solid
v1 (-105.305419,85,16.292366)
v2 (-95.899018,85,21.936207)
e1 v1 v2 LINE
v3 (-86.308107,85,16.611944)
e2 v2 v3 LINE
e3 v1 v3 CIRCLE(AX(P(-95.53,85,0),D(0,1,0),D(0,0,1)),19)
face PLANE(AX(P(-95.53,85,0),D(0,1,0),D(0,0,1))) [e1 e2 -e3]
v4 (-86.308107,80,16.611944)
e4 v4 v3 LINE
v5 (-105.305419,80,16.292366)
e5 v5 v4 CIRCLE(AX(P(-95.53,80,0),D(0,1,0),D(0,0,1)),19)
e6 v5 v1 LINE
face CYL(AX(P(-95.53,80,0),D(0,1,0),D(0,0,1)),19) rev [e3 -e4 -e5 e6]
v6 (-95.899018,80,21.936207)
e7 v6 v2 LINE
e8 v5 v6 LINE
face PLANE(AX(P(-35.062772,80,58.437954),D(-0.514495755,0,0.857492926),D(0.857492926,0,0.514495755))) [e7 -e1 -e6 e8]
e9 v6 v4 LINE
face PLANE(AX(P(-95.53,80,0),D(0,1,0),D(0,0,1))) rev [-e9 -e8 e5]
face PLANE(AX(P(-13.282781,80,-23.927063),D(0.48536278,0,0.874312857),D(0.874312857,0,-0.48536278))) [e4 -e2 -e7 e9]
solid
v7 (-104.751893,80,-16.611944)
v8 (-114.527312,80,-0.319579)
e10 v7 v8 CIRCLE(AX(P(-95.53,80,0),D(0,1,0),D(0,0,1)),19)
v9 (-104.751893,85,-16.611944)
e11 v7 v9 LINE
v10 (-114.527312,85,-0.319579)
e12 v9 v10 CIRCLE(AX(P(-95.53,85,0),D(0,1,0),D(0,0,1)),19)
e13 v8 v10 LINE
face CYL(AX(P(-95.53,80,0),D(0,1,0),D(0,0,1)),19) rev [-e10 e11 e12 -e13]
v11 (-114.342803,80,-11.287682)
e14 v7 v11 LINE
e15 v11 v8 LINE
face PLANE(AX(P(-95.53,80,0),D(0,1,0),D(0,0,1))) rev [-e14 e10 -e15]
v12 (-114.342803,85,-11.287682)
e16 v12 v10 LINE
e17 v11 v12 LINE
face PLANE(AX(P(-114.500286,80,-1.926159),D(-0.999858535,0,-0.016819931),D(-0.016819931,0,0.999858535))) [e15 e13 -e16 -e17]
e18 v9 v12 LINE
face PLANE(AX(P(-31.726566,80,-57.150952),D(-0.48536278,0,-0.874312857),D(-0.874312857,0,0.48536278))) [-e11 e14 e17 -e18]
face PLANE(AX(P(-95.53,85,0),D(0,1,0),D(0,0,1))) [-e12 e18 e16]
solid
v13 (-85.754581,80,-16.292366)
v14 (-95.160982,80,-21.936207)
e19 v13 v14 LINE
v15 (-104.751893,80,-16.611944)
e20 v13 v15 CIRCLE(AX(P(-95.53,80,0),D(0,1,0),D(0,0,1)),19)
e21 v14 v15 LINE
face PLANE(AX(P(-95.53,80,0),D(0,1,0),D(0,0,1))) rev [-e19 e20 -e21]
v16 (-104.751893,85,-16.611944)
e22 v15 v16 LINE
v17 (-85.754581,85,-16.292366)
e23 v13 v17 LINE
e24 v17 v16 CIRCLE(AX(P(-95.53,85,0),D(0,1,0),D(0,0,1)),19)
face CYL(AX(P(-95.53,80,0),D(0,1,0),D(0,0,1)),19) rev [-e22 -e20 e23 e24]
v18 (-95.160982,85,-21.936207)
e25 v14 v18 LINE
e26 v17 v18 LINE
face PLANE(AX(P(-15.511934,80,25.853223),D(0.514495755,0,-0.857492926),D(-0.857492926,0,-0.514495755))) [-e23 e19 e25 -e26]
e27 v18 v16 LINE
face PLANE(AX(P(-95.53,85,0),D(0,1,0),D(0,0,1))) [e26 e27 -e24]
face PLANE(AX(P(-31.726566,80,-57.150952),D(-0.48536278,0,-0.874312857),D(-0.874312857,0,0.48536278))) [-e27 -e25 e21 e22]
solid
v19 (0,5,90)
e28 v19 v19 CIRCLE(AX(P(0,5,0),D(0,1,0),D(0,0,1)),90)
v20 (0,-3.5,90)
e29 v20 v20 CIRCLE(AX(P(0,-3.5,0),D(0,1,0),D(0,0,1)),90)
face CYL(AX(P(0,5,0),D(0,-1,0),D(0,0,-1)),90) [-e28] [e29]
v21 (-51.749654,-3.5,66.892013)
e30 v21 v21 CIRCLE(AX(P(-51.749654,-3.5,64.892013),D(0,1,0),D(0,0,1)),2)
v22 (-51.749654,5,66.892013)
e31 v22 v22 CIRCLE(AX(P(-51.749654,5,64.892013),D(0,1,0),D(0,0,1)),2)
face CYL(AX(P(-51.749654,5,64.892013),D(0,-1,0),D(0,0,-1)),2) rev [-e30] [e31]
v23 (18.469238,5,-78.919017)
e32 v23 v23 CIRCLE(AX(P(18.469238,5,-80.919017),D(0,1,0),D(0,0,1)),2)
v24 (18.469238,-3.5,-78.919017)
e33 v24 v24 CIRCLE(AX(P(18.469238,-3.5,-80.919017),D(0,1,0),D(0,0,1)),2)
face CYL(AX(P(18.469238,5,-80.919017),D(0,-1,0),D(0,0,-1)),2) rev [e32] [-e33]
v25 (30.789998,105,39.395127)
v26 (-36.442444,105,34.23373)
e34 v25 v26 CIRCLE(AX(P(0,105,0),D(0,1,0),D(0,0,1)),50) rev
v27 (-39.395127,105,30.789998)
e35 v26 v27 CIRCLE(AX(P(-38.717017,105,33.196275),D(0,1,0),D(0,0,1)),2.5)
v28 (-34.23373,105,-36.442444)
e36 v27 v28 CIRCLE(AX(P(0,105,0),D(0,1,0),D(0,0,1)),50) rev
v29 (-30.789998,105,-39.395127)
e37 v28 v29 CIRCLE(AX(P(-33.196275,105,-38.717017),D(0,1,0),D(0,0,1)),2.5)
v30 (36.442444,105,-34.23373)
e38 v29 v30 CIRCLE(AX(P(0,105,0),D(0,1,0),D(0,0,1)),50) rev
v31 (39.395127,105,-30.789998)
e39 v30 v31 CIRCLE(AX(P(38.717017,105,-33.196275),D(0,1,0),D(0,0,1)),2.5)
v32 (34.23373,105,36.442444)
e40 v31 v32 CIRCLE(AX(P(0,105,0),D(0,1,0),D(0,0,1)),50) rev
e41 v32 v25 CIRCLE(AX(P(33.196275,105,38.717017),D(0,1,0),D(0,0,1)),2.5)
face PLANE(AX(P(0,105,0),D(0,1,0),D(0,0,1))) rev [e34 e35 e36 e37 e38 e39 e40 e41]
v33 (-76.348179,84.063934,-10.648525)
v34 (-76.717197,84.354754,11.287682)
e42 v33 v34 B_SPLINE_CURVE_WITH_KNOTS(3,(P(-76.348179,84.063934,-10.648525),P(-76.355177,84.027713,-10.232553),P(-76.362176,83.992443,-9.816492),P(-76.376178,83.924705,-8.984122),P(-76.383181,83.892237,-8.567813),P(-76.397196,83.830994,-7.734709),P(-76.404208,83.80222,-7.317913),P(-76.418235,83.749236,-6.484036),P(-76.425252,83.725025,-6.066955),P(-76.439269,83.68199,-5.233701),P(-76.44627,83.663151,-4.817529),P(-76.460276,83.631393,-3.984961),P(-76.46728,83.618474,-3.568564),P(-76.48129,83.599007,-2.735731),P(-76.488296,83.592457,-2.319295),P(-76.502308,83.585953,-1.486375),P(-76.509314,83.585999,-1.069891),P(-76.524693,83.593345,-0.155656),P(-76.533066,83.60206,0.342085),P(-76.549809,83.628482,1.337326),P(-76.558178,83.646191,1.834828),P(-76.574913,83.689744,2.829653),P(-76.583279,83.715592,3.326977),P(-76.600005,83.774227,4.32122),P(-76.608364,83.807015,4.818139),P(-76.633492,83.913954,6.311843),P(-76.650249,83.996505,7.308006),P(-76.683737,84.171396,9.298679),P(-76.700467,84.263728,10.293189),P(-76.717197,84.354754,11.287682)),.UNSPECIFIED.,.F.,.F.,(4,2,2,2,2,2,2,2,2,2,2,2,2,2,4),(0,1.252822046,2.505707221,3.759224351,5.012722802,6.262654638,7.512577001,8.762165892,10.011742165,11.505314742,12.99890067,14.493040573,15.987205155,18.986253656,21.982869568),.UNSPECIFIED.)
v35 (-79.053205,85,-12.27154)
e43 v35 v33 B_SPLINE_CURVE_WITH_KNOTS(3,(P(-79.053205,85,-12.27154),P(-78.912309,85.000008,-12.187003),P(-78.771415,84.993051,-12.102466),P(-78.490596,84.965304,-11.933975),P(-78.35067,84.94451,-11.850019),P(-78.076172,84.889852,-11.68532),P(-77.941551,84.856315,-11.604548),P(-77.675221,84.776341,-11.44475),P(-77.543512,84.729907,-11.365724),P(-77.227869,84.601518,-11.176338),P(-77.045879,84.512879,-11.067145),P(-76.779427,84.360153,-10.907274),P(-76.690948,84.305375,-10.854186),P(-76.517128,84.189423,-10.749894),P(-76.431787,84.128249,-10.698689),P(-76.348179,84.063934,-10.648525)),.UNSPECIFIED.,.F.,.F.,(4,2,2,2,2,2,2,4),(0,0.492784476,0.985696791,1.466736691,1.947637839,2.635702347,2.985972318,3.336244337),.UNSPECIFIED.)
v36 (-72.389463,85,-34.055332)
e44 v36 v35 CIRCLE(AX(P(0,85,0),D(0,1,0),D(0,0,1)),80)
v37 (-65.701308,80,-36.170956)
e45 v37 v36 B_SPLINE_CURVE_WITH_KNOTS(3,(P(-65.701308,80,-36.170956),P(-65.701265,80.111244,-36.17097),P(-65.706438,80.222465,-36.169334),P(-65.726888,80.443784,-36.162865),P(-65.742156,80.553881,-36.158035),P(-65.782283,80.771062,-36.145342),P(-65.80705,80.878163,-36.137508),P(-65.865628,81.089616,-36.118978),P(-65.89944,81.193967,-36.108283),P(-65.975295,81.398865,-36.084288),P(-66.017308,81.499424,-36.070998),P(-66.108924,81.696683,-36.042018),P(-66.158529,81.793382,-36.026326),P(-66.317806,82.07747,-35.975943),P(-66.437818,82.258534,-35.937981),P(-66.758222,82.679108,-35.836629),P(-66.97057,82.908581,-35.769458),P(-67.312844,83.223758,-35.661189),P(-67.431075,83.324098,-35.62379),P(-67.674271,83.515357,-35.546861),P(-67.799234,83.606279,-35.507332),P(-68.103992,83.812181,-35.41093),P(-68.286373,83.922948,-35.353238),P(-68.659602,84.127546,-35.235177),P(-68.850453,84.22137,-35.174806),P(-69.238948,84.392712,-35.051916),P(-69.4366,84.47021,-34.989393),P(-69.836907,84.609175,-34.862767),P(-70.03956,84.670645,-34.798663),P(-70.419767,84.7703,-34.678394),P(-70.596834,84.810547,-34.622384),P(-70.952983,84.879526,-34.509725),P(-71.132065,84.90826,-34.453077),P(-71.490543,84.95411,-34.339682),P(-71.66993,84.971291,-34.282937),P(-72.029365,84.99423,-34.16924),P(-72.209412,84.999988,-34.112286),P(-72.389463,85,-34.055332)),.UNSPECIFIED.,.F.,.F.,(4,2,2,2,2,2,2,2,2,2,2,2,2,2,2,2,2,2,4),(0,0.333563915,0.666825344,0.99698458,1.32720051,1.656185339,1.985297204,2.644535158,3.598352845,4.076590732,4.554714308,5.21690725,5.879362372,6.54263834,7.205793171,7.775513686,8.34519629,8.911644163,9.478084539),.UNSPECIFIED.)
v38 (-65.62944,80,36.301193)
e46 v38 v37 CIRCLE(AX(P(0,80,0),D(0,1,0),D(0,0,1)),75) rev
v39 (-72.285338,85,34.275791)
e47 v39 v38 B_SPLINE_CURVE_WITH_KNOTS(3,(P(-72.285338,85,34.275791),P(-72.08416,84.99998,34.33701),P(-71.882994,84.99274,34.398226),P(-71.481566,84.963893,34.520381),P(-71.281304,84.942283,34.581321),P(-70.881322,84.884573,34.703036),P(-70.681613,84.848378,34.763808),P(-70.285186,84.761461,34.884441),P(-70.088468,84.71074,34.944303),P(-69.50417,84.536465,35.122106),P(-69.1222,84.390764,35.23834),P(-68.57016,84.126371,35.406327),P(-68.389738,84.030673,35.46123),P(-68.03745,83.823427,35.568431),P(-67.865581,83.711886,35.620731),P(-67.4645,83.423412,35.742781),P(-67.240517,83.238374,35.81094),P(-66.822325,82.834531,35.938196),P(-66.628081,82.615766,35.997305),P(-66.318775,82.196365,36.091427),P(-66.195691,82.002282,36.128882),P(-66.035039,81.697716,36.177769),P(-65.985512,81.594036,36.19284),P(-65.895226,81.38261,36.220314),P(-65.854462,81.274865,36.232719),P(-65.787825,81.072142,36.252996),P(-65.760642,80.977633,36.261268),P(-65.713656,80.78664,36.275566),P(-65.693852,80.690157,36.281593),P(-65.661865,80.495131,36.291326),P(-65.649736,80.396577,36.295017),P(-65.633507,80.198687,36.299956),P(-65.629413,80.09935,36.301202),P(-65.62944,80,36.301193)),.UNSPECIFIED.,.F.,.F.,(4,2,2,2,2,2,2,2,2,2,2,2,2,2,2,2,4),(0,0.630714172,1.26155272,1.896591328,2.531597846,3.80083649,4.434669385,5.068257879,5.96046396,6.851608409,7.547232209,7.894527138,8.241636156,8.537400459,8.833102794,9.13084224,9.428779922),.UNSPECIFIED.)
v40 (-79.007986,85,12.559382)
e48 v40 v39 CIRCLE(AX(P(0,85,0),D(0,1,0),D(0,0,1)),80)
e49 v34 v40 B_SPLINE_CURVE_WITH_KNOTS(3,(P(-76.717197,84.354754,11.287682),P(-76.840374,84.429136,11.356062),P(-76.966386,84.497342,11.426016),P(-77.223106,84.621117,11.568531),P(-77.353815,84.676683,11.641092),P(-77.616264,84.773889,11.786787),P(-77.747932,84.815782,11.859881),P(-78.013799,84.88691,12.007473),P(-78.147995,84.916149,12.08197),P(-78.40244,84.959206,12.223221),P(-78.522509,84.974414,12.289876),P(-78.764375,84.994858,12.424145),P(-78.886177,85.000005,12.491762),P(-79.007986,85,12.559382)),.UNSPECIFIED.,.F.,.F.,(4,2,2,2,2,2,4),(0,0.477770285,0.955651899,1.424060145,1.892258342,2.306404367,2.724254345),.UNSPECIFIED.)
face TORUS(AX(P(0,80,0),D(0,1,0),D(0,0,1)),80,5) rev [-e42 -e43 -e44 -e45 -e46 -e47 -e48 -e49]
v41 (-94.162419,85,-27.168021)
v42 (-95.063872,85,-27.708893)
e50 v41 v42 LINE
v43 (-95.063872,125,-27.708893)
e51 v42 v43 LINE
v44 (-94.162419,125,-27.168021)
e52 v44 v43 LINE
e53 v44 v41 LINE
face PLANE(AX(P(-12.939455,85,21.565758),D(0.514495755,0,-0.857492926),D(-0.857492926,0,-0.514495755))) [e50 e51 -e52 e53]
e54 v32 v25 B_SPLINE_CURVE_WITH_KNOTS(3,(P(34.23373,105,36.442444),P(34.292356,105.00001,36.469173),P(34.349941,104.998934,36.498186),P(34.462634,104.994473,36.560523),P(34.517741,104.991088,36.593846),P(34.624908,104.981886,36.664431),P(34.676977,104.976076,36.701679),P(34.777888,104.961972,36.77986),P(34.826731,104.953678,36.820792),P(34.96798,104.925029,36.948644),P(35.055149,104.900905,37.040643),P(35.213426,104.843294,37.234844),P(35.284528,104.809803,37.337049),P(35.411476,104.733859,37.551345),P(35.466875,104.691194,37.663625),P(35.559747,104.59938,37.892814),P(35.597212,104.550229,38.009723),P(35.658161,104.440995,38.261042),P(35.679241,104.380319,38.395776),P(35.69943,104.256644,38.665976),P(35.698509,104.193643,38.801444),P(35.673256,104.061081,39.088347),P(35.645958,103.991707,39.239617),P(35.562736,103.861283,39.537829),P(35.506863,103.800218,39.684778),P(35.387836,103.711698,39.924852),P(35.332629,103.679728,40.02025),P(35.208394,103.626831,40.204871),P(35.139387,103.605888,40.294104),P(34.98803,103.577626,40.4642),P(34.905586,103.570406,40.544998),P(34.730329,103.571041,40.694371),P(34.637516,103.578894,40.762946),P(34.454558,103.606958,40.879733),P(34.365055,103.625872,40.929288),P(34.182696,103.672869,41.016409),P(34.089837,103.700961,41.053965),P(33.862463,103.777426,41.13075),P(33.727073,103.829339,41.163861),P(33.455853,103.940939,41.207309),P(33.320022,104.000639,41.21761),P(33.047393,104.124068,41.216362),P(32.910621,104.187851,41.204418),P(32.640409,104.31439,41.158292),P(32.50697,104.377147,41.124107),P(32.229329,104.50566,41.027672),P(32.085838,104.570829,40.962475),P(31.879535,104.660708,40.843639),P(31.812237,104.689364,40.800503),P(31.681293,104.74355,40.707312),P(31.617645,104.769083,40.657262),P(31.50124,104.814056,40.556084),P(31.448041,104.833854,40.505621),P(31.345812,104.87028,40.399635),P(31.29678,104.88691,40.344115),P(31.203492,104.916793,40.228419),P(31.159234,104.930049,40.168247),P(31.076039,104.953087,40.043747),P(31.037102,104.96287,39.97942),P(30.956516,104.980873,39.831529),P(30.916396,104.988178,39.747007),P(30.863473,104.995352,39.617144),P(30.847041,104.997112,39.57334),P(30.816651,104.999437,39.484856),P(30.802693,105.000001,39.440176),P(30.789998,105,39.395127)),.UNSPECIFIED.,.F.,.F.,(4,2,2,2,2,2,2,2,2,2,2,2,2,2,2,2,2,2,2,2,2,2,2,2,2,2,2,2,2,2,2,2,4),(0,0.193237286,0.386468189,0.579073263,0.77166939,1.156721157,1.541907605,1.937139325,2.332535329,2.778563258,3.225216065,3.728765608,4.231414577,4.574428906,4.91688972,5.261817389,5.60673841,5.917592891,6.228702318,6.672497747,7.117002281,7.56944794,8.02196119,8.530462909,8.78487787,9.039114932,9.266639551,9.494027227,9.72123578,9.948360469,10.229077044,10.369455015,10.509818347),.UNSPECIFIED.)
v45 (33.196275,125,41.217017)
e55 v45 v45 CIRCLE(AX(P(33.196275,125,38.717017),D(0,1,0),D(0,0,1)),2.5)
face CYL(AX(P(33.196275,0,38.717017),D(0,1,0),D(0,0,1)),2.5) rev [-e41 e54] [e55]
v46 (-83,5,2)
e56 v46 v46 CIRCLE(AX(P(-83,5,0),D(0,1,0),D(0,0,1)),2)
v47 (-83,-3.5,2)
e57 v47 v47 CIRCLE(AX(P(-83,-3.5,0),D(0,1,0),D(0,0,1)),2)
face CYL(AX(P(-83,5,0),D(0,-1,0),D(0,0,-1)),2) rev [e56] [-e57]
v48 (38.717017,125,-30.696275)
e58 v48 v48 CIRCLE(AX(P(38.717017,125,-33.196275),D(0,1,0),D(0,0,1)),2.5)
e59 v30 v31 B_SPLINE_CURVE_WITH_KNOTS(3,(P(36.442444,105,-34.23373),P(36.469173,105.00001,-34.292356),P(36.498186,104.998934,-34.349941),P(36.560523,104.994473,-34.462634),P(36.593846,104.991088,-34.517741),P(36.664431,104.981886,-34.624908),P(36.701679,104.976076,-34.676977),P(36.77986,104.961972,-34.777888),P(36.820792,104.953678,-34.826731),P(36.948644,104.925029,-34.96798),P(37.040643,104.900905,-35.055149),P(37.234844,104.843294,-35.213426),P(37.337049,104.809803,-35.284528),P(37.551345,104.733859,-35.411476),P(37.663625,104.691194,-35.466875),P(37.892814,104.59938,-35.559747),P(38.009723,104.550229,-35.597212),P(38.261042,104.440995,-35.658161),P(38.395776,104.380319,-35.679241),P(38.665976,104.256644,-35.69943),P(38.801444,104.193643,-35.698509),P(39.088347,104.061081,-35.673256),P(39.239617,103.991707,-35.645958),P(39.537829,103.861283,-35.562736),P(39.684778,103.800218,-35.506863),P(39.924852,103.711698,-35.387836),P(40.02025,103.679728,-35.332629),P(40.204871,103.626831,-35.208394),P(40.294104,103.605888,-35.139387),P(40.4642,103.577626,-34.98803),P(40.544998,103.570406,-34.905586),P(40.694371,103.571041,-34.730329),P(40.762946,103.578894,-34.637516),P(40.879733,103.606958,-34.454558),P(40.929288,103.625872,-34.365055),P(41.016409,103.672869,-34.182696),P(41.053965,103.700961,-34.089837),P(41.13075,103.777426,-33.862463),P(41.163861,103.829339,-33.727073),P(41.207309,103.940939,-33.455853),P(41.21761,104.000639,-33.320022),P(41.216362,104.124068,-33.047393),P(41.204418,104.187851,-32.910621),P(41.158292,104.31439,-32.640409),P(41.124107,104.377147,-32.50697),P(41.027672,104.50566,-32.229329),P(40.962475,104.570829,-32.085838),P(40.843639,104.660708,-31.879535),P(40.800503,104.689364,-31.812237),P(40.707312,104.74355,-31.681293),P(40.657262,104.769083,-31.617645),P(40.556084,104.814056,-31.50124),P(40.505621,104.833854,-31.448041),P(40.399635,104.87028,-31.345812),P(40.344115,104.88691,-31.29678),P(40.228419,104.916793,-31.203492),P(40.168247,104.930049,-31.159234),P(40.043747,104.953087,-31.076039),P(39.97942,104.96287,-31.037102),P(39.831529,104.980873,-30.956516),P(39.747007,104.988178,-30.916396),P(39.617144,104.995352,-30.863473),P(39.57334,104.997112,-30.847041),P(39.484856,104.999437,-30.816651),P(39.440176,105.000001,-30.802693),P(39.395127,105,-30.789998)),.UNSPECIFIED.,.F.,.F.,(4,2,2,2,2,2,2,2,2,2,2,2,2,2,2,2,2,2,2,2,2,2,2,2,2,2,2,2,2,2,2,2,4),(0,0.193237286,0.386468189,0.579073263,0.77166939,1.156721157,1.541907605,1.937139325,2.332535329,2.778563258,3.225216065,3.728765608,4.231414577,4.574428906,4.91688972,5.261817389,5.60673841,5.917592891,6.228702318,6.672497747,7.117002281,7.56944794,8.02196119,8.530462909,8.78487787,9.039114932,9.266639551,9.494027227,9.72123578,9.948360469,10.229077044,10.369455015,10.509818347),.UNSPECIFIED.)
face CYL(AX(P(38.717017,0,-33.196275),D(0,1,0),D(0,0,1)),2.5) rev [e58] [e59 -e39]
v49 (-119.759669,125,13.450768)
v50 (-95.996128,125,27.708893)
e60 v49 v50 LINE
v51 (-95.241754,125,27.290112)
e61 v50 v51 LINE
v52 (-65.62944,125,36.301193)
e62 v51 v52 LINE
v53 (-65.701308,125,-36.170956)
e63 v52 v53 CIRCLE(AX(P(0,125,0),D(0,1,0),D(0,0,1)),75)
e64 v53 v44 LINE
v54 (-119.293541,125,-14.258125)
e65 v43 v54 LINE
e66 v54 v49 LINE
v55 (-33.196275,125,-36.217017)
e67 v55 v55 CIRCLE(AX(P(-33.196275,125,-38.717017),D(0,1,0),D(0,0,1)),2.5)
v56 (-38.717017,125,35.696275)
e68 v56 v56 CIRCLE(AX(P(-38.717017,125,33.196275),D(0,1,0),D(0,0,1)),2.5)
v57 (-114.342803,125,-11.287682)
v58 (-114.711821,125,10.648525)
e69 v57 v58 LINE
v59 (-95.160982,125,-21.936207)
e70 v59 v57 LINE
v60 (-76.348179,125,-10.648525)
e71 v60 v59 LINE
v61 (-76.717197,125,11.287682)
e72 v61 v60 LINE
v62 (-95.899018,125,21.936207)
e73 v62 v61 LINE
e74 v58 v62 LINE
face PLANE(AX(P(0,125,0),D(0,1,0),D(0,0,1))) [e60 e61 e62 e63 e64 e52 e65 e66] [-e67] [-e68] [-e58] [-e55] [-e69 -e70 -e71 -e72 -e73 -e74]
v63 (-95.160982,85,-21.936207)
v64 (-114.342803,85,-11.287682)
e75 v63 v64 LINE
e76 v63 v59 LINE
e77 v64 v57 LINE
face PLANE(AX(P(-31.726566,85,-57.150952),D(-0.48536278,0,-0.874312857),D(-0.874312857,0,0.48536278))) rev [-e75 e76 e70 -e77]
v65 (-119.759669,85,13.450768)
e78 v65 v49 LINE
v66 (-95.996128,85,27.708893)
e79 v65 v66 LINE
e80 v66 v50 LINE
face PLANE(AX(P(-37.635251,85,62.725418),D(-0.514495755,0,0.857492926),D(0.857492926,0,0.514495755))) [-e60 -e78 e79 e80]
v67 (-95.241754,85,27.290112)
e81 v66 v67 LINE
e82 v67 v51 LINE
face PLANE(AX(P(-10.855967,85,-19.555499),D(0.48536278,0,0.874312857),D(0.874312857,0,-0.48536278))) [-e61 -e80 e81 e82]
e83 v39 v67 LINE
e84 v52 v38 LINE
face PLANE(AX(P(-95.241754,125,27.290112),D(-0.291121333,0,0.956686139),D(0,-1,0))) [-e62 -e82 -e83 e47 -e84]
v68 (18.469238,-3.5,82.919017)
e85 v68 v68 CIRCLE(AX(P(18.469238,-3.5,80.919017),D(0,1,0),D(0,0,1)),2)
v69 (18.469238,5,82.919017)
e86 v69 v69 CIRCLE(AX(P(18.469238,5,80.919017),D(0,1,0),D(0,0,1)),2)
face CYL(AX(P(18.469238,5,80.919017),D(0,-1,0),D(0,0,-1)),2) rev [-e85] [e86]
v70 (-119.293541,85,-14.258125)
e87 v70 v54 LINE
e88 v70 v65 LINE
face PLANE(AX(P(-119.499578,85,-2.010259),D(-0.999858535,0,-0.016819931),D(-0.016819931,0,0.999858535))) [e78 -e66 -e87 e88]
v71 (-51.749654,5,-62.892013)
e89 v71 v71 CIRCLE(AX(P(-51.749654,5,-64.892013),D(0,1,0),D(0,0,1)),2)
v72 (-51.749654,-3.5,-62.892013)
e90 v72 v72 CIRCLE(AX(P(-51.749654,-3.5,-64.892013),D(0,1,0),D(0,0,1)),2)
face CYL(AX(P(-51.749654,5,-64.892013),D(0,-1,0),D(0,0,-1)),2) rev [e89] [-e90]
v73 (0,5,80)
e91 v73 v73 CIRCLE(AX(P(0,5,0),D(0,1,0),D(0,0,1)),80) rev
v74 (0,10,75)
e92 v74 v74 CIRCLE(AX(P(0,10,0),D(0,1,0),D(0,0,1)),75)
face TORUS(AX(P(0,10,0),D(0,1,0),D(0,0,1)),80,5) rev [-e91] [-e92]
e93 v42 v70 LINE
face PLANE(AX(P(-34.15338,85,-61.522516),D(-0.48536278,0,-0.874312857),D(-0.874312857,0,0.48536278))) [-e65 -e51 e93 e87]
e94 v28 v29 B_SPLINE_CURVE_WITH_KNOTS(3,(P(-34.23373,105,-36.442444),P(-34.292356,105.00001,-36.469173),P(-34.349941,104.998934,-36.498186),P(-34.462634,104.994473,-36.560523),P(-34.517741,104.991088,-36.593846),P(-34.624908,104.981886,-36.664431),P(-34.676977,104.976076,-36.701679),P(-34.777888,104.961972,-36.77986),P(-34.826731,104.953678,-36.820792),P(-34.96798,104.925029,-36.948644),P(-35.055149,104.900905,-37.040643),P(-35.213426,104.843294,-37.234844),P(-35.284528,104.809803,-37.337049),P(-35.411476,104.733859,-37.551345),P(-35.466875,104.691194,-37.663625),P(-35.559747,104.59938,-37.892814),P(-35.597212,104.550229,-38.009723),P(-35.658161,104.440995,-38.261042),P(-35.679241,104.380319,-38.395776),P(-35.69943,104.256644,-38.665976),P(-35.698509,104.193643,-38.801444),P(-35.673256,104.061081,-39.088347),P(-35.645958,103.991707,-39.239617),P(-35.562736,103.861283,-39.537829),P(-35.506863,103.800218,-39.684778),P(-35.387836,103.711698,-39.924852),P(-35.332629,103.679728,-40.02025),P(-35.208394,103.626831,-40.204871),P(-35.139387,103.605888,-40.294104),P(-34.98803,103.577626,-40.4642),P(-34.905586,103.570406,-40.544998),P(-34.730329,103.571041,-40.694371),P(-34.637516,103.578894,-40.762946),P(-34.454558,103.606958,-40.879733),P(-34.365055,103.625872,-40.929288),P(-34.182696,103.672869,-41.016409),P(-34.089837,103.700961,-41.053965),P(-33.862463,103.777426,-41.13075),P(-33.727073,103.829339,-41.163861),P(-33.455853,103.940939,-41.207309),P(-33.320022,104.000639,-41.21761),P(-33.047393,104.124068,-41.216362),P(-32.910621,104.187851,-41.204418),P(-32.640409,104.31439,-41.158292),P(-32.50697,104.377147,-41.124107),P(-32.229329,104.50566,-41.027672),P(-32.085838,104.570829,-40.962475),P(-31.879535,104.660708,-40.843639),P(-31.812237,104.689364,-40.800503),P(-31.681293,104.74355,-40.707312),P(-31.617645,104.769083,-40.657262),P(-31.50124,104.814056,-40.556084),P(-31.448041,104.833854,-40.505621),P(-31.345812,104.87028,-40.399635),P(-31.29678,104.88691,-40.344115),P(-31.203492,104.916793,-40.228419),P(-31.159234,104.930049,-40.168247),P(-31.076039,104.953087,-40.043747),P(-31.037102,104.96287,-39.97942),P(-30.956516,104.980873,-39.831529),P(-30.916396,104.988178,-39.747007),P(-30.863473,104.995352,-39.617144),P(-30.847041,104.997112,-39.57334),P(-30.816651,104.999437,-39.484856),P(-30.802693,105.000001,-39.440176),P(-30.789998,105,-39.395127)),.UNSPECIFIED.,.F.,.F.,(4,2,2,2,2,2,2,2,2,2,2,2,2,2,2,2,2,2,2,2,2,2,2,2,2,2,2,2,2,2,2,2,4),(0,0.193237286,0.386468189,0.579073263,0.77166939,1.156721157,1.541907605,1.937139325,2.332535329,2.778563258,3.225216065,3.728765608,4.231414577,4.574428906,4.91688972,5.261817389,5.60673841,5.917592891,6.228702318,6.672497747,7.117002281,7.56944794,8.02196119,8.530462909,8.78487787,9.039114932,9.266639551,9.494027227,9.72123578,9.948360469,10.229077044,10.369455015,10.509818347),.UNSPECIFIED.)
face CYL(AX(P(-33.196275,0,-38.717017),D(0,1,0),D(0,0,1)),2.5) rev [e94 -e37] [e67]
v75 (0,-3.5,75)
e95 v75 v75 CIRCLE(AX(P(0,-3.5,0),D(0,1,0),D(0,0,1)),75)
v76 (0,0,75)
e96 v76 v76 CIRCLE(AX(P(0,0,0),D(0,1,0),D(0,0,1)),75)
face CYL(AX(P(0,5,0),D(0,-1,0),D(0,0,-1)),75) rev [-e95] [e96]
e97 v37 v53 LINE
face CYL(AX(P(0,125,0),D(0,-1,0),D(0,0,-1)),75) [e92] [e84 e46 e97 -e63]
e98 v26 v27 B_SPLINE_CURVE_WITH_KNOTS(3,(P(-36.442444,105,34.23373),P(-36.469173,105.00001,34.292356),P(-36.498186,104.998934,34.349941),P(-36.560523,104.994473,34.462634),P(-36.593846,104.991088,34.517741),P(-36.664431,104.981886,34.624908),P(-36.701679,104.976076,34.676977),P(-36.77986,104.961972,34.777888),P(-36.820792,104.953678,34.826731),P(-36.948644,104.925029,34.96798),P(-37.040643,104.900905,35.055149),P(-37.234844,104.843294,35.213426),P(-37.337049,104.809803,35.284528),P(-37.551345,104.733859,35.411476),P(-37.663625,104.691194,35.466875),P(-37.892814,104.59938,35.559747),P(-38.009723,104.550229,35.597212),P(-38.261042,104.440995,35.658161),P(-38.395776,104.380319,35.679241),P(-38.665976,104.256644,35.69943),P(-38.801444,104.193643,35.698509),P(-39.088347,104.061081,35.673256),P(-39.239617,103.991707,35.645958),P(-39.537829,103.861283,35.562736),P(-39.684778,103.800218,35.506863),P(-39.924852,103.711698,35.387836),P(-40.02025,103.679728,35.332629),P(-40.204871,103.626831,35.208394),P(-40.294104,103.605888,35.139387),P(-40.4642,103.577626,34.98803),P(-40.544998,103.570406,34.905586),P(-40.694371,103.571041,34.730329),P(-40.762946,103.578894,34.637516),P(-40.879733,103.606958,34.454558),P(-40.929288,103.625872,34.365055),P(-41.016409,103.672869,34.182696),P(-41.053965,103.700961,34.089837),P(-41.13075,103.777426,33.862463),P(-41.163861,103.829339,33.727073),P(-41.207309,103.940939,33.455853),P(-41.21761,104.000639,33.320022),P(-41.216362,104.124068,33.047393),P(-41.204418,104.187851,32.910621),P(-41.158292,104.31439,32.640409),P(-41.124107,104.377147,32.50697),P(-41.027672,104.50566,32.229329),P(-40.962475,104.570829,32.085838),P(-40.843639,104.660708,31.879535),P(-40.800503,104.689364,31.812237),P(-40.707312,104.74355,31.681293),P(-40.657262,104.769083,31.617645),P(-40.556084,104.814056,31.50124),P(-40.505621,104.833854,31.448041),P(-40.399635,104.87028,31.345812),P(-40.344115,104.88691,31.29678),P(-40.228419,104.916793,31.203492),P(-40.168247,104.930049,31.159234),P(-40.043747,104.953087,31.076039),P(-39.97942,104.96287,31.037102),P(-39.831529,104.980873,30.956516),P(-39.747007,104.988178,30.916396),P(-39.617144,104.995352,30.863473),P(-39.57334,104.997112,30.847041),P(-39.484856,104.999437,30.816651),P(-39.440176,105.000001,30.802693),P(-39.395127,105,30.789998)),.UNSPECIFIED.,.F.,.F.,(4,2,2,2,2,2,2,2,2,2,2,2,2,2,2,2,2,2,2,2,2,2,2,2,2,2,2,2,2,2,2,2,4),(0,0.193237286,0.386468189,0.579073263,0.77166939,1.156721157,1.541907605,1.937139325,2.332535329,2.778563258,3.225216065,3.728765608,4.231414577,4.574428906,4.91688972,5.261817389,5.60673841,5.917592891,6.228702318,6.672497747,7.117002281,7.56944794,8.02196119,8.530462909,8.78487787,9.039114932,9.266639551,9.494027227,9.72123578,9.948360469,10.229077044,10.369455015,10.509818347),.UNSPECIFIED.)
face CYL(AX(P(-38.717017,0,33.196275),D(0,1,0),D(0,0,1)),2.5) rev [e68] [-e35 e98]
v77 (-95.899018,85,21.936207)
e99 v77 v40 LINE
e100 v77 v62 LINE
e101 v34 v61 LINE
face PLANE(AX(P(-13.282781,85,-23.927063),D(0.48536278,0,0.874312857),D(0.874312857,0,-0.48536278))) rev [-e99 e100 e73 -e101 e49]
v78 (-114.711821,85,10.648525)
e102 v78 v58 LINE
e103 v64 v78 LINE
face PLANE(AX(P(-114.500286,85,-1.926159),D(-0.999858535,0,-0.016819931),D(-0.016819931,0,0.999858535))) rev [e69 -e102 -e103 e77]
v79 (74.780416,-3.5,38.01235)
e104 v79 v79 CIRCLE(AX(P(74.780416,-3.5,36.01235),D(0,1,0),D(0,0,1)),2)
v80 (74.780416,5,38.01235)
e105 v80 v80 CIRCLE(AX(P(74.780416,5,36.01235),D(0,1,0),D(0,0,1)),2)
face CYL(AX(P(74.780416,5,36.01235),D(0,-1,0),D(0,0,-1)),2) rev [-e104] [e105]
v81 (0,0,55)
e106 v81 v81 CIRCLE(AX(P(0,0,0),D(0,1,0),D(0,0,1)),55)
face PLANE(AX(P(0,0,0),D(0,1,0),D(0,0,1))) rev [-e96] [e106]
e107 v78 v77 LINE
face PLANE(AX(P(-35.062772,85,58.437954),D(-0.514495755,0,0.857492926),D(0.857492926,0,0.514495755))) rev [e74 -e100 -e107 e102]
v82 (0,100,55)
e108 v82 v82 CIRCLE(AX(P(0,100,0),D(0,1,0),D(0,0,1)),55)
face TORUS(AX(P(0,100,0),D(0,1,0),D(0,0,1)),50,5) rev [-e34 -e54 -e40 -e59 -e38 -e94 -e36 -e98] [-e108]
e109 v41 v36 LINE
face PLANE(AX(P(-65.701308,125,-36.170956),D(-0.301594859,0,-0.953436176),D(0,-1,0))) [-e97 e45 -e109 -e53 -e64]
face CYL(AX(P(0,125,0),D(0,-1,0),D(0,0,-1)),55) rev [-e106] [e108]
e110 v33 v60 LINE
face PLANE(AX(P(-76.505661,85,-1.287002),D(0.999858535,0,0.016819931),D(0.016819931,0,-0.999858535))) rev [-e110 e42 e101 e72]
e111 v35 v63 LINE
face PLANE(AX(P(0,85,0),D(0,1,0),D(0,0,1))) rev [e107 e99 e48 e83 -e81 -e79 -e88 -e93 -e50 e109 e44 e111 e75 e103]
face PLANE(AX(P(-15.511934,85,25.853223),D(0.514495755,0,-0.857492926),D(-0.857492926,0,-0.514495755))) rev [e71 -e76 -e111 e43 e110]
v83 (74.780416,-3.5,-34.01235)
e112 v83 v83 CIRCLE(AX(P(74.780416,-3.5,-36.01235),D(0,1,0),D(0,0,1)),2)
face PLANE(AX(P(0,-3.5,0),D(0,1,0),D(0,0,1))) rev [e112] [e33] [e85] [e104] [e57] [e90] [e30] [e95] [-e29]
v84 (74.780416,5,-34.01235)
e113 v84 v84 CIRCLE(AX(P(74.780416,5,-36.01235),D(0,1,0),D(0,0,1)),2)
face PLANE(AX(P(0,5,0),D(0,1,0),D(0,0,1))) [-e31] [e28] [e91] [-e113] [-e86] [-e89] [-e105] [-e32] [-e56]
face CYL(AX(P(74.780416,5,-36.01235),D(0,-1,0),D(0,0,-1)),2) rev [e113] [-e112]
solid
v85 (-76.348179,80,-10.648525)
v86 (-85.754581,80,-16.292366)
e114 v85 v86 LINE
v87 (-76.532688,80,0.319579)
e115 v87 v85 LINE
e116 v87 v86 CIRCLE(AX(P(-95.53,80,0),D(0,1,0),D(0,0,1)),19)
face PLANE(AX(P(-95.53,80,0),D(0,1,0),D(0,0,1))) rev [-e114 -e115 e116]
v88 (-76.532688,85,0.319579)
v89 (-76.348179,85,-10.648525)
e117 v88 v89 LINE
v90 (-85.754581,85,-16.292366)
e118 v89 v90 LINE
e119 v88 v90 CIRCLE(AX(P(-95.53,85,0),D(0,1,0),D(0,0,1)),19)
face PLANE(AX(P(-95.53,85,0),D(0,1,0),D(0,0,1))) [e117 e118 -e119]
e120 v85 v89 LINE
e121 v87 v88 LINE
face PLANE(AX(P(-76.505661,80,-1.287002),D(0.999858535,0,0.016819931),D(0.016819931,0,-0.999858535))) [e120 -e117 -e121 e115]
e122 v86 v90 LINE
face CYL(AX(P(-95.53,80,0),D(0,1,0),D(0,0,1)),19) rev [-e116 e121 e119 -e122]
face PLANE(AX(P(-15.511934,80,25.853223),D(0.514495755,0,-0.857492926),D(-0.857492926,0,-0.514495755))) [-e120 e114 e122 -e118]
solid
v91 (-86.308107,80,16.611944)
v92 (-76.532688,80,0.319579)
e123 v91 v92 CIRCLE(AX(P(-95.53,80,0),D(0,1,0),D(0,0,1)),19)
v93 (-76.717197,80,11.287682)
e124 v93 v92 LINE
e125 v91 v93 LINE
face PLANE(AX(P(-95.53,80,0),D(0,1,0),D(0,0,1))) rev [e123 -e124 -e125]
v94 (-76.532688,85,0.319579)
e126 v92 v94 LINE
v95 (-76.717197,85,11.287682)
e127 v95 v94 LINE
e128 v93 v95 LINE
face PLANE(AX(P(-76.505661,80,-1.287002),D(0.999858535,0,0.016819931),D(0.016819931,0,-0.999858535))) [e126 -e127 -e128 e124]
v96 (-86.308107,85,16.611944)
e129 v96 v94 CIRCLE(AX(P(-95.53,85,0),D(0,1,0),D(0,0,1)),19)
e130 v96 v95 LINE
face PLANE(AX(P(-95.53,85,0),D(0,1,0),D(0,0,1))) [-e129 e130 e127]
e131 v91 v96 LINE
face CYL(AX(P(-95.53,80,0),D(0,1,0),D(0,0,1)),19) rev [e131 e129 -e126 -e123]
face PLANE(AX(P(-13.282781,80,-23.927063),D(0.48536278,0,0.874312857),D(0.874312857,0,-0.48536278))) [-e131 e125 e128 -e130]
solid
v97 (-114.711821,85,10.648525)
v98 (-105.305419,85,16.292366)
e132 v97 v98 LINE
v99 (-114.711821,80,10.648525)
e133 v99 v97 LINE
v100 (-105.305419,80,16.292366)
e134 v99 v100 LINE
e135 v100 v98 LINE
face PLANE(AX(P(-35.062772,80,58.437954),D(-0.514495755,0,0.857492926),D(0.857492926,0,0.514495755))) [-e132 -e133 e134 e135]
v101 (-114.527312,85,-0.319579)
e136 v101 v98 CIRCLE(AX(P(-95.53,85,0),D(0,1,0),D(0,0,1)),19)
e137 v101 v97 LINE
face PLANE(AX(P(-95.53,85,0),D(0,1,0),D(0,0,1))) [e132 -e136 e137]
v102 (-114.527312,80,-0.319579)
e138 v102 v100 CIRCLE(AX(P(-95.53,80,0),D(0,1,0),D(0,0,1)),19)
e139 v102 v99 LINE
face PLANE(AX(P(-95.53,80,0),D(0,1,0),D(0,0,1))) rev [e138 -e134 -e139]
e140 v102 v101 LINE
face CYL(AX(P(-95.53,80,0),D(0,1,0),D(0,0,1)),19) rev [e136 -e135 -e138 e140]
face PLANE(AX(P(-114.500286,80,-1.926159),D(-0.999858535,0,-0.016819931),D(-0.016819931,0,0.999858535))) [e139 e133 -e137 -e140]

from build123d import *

# Parameters (mm, degrees)
CROQUIS4_R                 = 75
SALIENTE_EXTRUIR2_DEPTH    = 125
VACIADO1_T                 = -20
CROQUIS7_R                 = 2.5
CORTAR_EXTRUIR3_DEPTH      = 164.935963108
SALIENTE_EXTRUIR5_START    = -3.5
CROQUIS4_3_R               = 90
CROQUIS4_3_R_2             = 75
CROQUIS4_3_R_3             = 2
SALIENTE_EXTRUIR5_DEPTH    = 8.5
CROQUIS8_R                 = 19
SALIENTE_EXTRUIR7_DEPTH    = 40
REDONDEO2_R                = 5
REDONDEO4_R                = 5
SALIENTE_EXTRUIR13_START   = -40
SALIENTE_EXTRUIR13_DEPTH   = 5
SALIENTE_EXTRUIR13_2_DEPTH = 5
SALIENTE_EXTRUIR13_3_DEPTH = 5
SALIENTE_EXTRUIR13_4_DEPTH = 5
SALIENTE_EXTRUIR13_5_DEPTH = 5
SALIENTE_EXTRUIR13_6_DEPTH = 5
REDONDEO6_R                = 5


with BuildPart() as part:
    # Croquis4 → Saliente-Extruir2 (new body)
    with BuildSketch(Plane(origin=(0, 0, 0), x_dir=(1, 0, 0), z_dir=(0, 1, 0))):
        with Locations(Location((0, 0, 0), (0, 0, 270))):
            Circle(CROQUIS4_R)
    extrude(amount=SALIENTE_EXTRUIR2_DEPTH)

    # Vaciado1
    vaciado1_openings = [part.faces().sort_by_distance(p)[0] for p in [
        (0, 0, 0),
    ]]
    offset(amount=VACIADO1_T, openings=vaciado1_openings, kind=Kind.INTERSECTION)

    # Croquis7 → Cortar-Extruir3 (cut, through all)
    with BuildSketch(Plane(origin=(0, 125, 0), x_dir=(1, 0, 0), z_dir=(0, 1, 0))):
        with Locations(Location((38.717017325, 33.196274595, 0), (0, 0, 270))):
            Circle(CROQUIS7_R)
        with Locations(Location((33.196274595, -38.717017325, 0), (0, 0, 270))):
            Circle(CROQUIS7_R)
        with Locations(Location((-38.717017325, -33.196274595, 0), (0, 0, 270))):
            Circle(CROQUIS7_R)
        with Locations(Location((-33.196274595, 38.717017325, 0), (0, 0, 270))):
            Circle(CROQUIS7_R)
    extrude(amount=-CORTAR_EXTRUIR3_DEPTH, mode=Mode.SUBTRACT)

    # Croquis4<3> → Saliente-Extruir5 (add)
    with BuildSketch(Plane(origin=(0, 0, 0), x_dir=(1, 0, 0), z_dir=(0, 1, 0)).offset(SALIENTE_EXTRUIR5_START)):
        with Locations(Location((0, 0, 0), (0, 0, 270))):
            Circle(CROQUIS4_3_R)
        with Locations(Location((0, 0, 0), (0, 0, 270))):
            Circle(CROQUIS4_3_R_2, mode=Mode.SUBTRACT)
        with Locations(Location((-83, 0, 0), (0, 0, 270))):
            Circle(CROQUIS4_3_R_3, mode=Mode.SUBTRACT)
        with Locations(Location((-51.749653554, 64.892013045, 0), (0, 0, 270))):
            Circle(CROQUIS4_3_R_3, mode=Mode.SUBTRACT)
        with Locations(Location((18.469237518, 80.919016711, 0), (0, 0, 270))):
            Circle(CROQUIS4_3_R_3, mode=Mode.SUBTRACT)
        with Locations(Location((74.780416036, 36.012350347, 0), (0, 0, 270))):
            Circle(CROQUIS4_3_R_3, mode=Mode.SUBTRACT)
        with Locations(Location((74.780416036, -36.012350347, 0), (0, 0, 270))):
            Circle(CROQUIS4_3_R_3, mode=Mode.SUBTRACT)
        with Locations(Location((18.469237518, -80.919016711, 0), (0, 0, 270))):
            Circle(CROQUIS4_3_R_3, mode=Mode.SUBTRACT)
        with Locations(Location((-51.749653554, -64.892013045, 0), (0, 0, 270))):
            Circle(CROQUIS4_3_R_3, mode=Mode.SUBTRACT)
    extrude(amount=SALIENTE_EXTRUIR5_DEPTH)

    # Croquis8 → Saliente-Extruir7 (add)
    # profile 1 of 2: a face of its own
    with BuildSketch(Plane(origin=(0, 125, 0), x_dir=(1, 0, 0), z_dir=(0, 1, 0))):
        Polygon((-71.300331354, 13.450767908), (-95.063872385, 27.708892527), (-119.293541031, 14.258124619), (-119.759668646, -13.450767908), (-95.996127615, -27.708892527), (-71.766458969, -14.258124619), align=None)
        Polygon((-114.342803317, 11.28768199), (-114.711821011, -10.648524594), (-95.899017695, -21.936206584), (-76.717196683, -11.28768199), (-76.348178989, 10.648524594), (-95.160982305, 21.936206584), align=None, mode=Mode.SUBTRACT)
    # profile 2 of 2: a face of its own
    with BuildSketch(Plane(origin=(0, 125, 0), x_dir=(1, 0, 0), z_dir=(0, 1, 0))):
        with Locations((-95.53, 0)):
            Circle(CROQUIS8_R)
    extrude(amount=-SALIENTE_EXTRUIR7_DEPTH)


with BuildPart() as saliente_extruir7_kept_piece:
    # of the separate pieces the step leaves, the one the design keeps (saliente_extruir7_pieces_kept)
    add(part.part.solids().sort_by_distance((0, 5, 75))[0])

    # Redondeo2
    redondeo2_edges = [saliente_extruir7_kept_piece.edges().sort_by_distance(p)[0] for p in [
        (0, 5, -75),
    ]]
    fillet(redondeo2_edges, radius=REDONDEO2_R)

    # Redondeo4
    # the kernel refuses this fillet: 5 mm, written as the material it adds along each edge
    with BuildSketch(Plane(origin=(0, 105, 0), x_dir=(0, 0, 1), z_dir=(1, 0, 0))) as redondeo4_piece_1_section:
        with BuildLine():
            CenterArc((55 - REDONDEO4_R, REDONDEO4_R), REDONDEO4_R, 270, 90)
            Line((55, REDONDEO4_R), (55, 0))
            Line((55, 0), (55 - REDONDEO4_R, 0))
        make_face()
    redondeo4_piece_1 = revolve(axis=Axis((0, 105, 0), (0, -1, 0)), mode=Mode.PRIVATE)
    redondeo4_piece_1 = redondeo4_piece_1 - Plane(origin=(38.717017325, 103.626528968, -33.196274595), x_dir=(0, 0, 1), z_dir=(0, 1, 0)) * Cylinder(2.5, 221, mode=Mode.PRIVATE)
    redondeo4_piece_1 = redondeo4_piece_1 - Plane(origin=(-38.717017325, 103.626528968, 33.196274595), x_dir=(0, 0, 1), z_dir=(0, 1, 0)) * Cylinder(2.5, 221, mode=Mode.PRIVATE)
    redondeo4_piece_1 = redondeo4_piece_1 - Plane(origin=(33.196274595, 103.626528968, 38.717017325), x_dir=(0, 0, 1), z_dir=(0, 1, 0)) * Cylinder(2.5, 221, mode=Mode.PRIVATE)
    redondeo4_piece_1 = redondeo4_piece_1 - Plane(origin=(-33.196274595, 103.626528968, -38.717017325), x_dir=(0, 0, 1), z_dir=(0, 1, 0)) * Cylinder(2.5, 221, mode=Mode.PRIVATE)
    add(redondeo4_piece_1)

    # Chaflán3
    # the kernel refuses this chamfer: 30, 29.484397342, 28.701154758 mm, written as the material it adds along each edge
    with BuildSketch(Plane(origin=(-73.527799341, 125, -14.7872487), x_dir=(0.381350742936225, 0, -0.9244304251061781), z_dir=(0, -1, 0))) as chafl_n3_piece_1:
        with BuildLine():
            Line((23.523264647, 0), (2.805258153, -24.716333297))
            Line((2.805258153, -24.716333297), (2.21192062, -24.805499276))
            ThreePointArc((2.21192062, -24.805499276), (1.253792922, -12.380533549), (-0.593337533, -0.089165979))
            Line((-0.593337533, -0.089165979), (0.114960786, 0.588883705))
            ThreePointArc((0.114960786, 0.588883705), (11.735307987, -0.742868252), (23.456206328, 0.596240876))
            Line((23.456206328, 0.596240876), (23.523264647, 0))
        make_face()
    extrude(amount=40)
    with BuildSketch(Plane(origin=(-73.445595934, 125, 15.190274453), x_dir=(0.38543599554607183, 0, 0.9227345736111813), z_dir=(0, -1, 0))) as chafl_n3_piece_2:
        with BuildLine():
            Line((23.257245589, 0), (1.999072097, 25.700452091))
            Line((1.999072097, 25.700452091), (1.402771104, 25.766973714))
            ThreePointArc((1.402771104, 25.766973714), (0.831898528, 12.868927205), (-0.596300993, 0.066521623))
            Line((-0.596300993, 0.066521623), (0.11433588, -0.589005354))
            ThreePointArc((0.11433588, -0.589005354), (11.602371085, 0.725699157), (23.191642246, -0.596402717))
            Line((23.191642246, -0.596402717), (23.257245589, 0))
        make_face()
    extrude(amount=40)

    # Redondeo6
    # the kernel refuses this fillet: 5 mm, written as the material it adds along each edge
    with BuildSketch(Plane(origin=(0, 85, 0), x_dir=(-0.7826201590817276, 0, 0.6224995474688245), z_dir=(0.6224995474688245, 0, 0.7826201590817276))) as redondeo6_piece_1_section:
        with BuildLine():
            CenterArc((75 + REDONDEO6_R, REDONDEO6_R), REDONDEO6_R, 180, 90)
            Line((75, REDONDEO6_R), (75, 0))
            Line((75, 0), (75 + REDONDEO6_R, 0))
        make_face()
    redondeo6_piece_1 = revolve(axis=Axis((0, 85, 0), (0, -1, 0)), revolution_arc=76.884153407, mode=Mode.PRIVATE)
    redondeo6_piece_1 = split(redondeo6_piece_1, bisect_by=Plane(origin=(-74.896065, 83.822942574, 33.481342498), z_dir=(0.29112133338685325, 0, -0.9566861393618393)), keep=Keep.TOP, mode=Mode.PRIVATE)
    redondeo6_piece_1 = split(redondeo6_piece_1, bisect_by=Plane(origin=(-76.922599178, 83.822942574, 23.497805272), z_dir=(0.999858534946269, 0, 0.016819931483235375)), keep=Keep.TOP, mode=Mode.PRIVATE)
    redondeo6_piece_1 = split(redondeo6_piece_1, bisect_by=Plane(origin=(-78.239920348, 83.822942574, 12.133001127), z_dir=(0.4853627795187392, 0, 0.8743128571957774)), keep=Keep.TOP, mode=Mode.PRIVATE)
    add(redondeo6_piece_1)
    with BuildSketch(Plane(origin=(0, 85, 0), x_dir=(-0.7826201590817276, 0, 0.6224995474688245), z_dir=(0.6224995474688245, 0, 0.7826201590817276))) as redondeo6_piece_2_section:
        with BuildLine():
            CenterArc((75 + REDONDEO6_R, REDONDEO6_R), REDONDEO6_R, 180, 90)
            Line((75, REDONDEO6_R), (75, 0))
            Line((75, 0), (75 + REDONDEO6_R, 0))
        make_face()
    redondeo6_piece_2 = revolve(axis=Axis((0, 85, 0), (0, -1, 0)), revolution_arc=76.884153407, mode=Mode.PRIVATE)
    redondeo6_piece_2 = split(redondeo6_piece_2, bisect_by=Plane(origin=(-70.772136149, 83.611311892, -7.30289889), z_dir=(-0.5144957554275298, 0, 0.8574929257125423)), keep=Keep.TOP, mode=Mode.PRIVATE)
    redondeo6_piece_2 = split(redondeo6_piece_2, bisect_by=Plane(origin=(-76.534162197, 83.611311892, 0.407221865), z_dir=(0.999858534946269, 0, 0.016819931483235375)), keep=Keep.TOP, mode=Mode.PRIVATE)
    redondeo6_piece_2 = split(redondeo6_piece_2, bisect_by=Plane(origin=(-71.108416802, 83.611311892, 8.17404484), z_dir=(-0.4853627795187392, 0, -0.8743128571957774)), keep=Keep.TOP, mode=Mode.PRIVATE)
    add(redondeo6_piece_2)
    with BuildSketch(Plane(origin=(0, 85, 0), x_dir=(-0.7826201590817276, 0, 0.6224995474688245), z_dir=(0.6224995474688245, 0, 0.7826201590817276))) as redondeo6_piece_3_section:
        with BuildLine():
            CenterArc((75 + REDONDEO6_R, REDONDEO6_R), REDONDEO6_R, 180, 90)
            Line((75, REDONDEO6_R), (75, 0))
            Line((75, 0), (75 + REDONDEO6_R, 0))
        make_face()
    redondeo6_piece_3 = revolve(axis=Axis((0, 85, 0), (0, -1, 0)), revolution_arc=76.884153407, mode=Mode.PRIVATE)
    redondeo6_piece_3 = split(redondeo6_piece_3, bisect_by=Plane(origin=(-76.773643324, 84.953684215, 14.643144842), z_dir=(-0.999858534946269, 0, -0.016819931483235375)), keep=Keep.TOP, mode=Mode.PRIVATE)
    redondeo6_piece_3 = split(redondeo6_piece_3, bisect_by=Plane(origin=(-78.648333945, 84.953684215, 12.359726328), z_dir=(0.4853627795187392, 0, 0.8743128571957774)), keep=Keep.TOP, mode=Mode.PRIVATE)
    add(redondeo6_piece_3)
    with BuildSketch(Plane(origin=(0, 85, 0), x_dir=(-0.7826201590817276, 0, 0.6224995474688245), z_dir=(0.6224995474688245, 0, 0.7826201590817276))) as redondeo6_piece_4_section:
        with BuildLine():
            CenterArc((75 + REDONDEO6_R, REDONDEO6_R), REDONDEO6_R, 180, 90)
            Line((75, REDONDEO6_R), (75, 0))
            Line((75, 0), (75 + REDONDEO6_R, 0))
        make_face()
    redondeo6_piece_4 = revolve(axis=Axis((0, 85, 0), (0, -1, 0)), revolution_arc=76.884153407, mode=Mode.PRIVATE)
    redondeo6_piece_4 = split(redondeo6_piece_4, bisect_by=Plane(origin=(-78.706021508, 83.804223289, -12.063230105), z_dir=(0.5144957554275298, 0, -0.8574929257125423)), keep=Keep.TOP, mode=Mode.PRIVATE)
    redondeo6_piece_4 = split(redondeo6_piece_4, bisect_by=Plane(origin=(-74.993748664, 83.804223289, -33.231533392), z_dir=(0.3015948586661436, 0, 0.9534361757486176)), keep=Keep.TOP, mode=Mode.PRIVATE)
    redondeo6_piece_4 = split(redondeo6_piece_4, bisect_by=Plane(origin=(-76.132099298, 83.804223289, -23.493352354), z_dir=(0.999858534946269, 0, 0.016819931483235375)), keep=Keep.TOP, mode=Mode.PRIVATE)
    add(redondeo6_piece_4)
    with BuildSketch(Plane(origin=(0, 85, 0), x_dir=(-0.7826201590817276, 0, 0.6224995474688245), z_dir=(0.6224995474688245, 0, 0.7826201590817276))) as redondeo6_piece_5_section:
        with BuildLine():
            CenterArc((75 + REDONDEO6_R, REDONDEO6_R), REDONDEO6_R, 180, 90)
            Line((75, REDONDEO6_R), (75, 0))
            Line((75, 0), (75 + REDONDEO6_R, 0))
        make_face()
    redondeo6_piece_5 = revolve(axis=Axis((0, 85, 0), (0, -1, 0)), revolution_arc=76.884153407, mode=Mode.PRIVATE)
    redondeo6_piece_5 = split(redondeo6_piece_5, bisect_by=Plane(origin=(-78.688496623, 84.897623129, -12.052715174), z_dir=(0.5144957554275298, 0, -0.8574929257125423)), keep=Keep.TOP, mode=Mode.PRIVATE)
    redondeo6_piece_5 = split(redondeo6_piece_5, bisect_by=Plane(origin=(-76.276989817, 84.897623129, -14.880355225), z_dir=(-0.999858534946269, 0, -0.016819931483235375)), keep=Keep.TOP, mode=Mode.PRIVATE)
    add(redondeo6_piece_5)


with BuildPart() as body_2:
    # Croquis8<5> → Saliente-Extruir13 (new body)
    with BuildSketch(Plane(origin=(0, 125, 0), x_dir=(1, 0, 0), z_dir=(0, 1, 0)).offset(SALIENTE_EXTRUIR13_START)):
        with BuildLine():
            Line((-76.348178989, 10.648524594), (-85.75457996, 16.292365177))
            ThreePointArc((-85.75457996, 16.292365177), (-78.996201574, 9.361277136), (-76.53, 0))
            ThreePointArc((-76.53, 0), (-76.530671976, -0.159795652), (-76.532687858, -0.319580001))
            Line((-76.532687858, -0.319580001), (-76.348178989, 10.648524594))
        make_face()
    extrude(amount=-SALIENTE_EXTRUIR13_DEPTH)


with BuildPart() as body_3:
    # Croquis8<5> → Saliente-Extruir13 2 (new body)
    with BuildSketch(Plane(origin=(0, 125, 0), x_dir=(1, 0, 0), z_dir=(0, 1, 0)).offset(SALIENTE_EXTRUIR13_START)):
        with BuildLine():
            Line((-95.160982305, 21.936206584), (-104.751890639, 16.611945492))
            ThreePointArc((-104.751890639, 16.611945492), (-95.21041966, 18.997312136), (-85.75457996, 16.292365177))
            Line((-85.75457996, 16.292365177), (-95.160982305, 21.936206584))
        make_face()
    extrude(amount=-SALIENTE_EXTRUIR13_2_DEPTH)


with BuildPart() as body_4:
    # Croquis8<5> → Saliente-Extruir13 3 (new body)
    with BuildSketch(Plane(origin=(0, 125, 0), x_dir=(1, 0, 0), z_dir=(0, 1, 0)).offset(SALIENTE_EXTRUIR13_START)):
        with BuildLine():
            Line((-104.751890639, 16.611945492), (-114.342803317, 11.28768199))
            Line((-114.342803317, 11.28768199), (-114.527312146, 0.319579785))
            ThreePointArc((-114.527312146, 0.319579785), (-111.82236467, 9.775420884), (-104.751890639, 16.611945492))
        make_face()
    extrude(amount=-SALIENTE_EXTRUIR13_3_DEPTH)


with BuildPart() as body_5:
    # Croquis8<5> → Saliente-Extruir13 4 (new body)
    with BuildSketch(Plane(origin=(0, 125, 0), x_dir=(1, 0, 0), z_dir=(0, 1, 0)).offset(SALIENTE_EXTRUIR13_START)):
        with BuildLine():
            ThreePointArc((-105.305420348, -16.292364991), (-112.141944832, -9.221891828), (-114.527312146, 0.319579785))
            Line((-114.527312146, 0.319579785), (-114.711821011, -10.648524594))
            Line((-114.711821011, -10.648524594), (-105.305420348, -16.292364991))
        make_face()
    extrude(amount=-SALIENTE_EXTRUIR13_4_DEPTH)


with BuildPart() as body_6:
    # Croquis8<5> → Saliente-Extruir13 5 (new body)
    with BuildSketch(Plane(origin=(0, 125, 0), x_dir=(1, 0, 0), z_dir=(0, 1, 0)).offset(SALIENTE_EXTRUIR13_START)):
        with BuildLine():
            ThreePointArc((-86.308109406, -16.611945517), (-95.849580546, -18.997312133), (-105.305420348, -16.292364991))
            Line((-105.305420348, -16.292364991), (-95.899017695, -21.936206584))
            Line((-95.899017695, -21.936206584), (-86.308109406, -16.611945517))
        make_face()
    extrude(amount=-SALIENTE_EXTRUIR13_5_DEPTH)


with BuildPart() as body_7:
    # Croquis8<5> → Saliente-Extruir13 6 (new body)
    with BuildSketch(Plane(origin=(0, 125, 0), x_dir=(1, 0, 0), z_dir=(0, 1, 0)).offset(SALIENTE_EXTRUIR13_START)):
        with BuildLine():
            ThreePointArc((-76.532687858, -0.319580001), (-79.237635399, -9.775420999), (-86.308109406, -16.611945517))
            Line((-86.308109406, -16.611945517), (-76.717196683, -11.28768199))
            Line((-76.717196683, -11.28768199), (-76.532687858, -0.319580001))
        make_face()
    extrude(amount=-SALIENTE_EXTRUIR13_6_DEPTH)


solid = Compound([saliente_extruir7_kept_piece.part, body_2.part, body_3.part, body_4.part, body_5.part, body_6.part, body_7.part])
